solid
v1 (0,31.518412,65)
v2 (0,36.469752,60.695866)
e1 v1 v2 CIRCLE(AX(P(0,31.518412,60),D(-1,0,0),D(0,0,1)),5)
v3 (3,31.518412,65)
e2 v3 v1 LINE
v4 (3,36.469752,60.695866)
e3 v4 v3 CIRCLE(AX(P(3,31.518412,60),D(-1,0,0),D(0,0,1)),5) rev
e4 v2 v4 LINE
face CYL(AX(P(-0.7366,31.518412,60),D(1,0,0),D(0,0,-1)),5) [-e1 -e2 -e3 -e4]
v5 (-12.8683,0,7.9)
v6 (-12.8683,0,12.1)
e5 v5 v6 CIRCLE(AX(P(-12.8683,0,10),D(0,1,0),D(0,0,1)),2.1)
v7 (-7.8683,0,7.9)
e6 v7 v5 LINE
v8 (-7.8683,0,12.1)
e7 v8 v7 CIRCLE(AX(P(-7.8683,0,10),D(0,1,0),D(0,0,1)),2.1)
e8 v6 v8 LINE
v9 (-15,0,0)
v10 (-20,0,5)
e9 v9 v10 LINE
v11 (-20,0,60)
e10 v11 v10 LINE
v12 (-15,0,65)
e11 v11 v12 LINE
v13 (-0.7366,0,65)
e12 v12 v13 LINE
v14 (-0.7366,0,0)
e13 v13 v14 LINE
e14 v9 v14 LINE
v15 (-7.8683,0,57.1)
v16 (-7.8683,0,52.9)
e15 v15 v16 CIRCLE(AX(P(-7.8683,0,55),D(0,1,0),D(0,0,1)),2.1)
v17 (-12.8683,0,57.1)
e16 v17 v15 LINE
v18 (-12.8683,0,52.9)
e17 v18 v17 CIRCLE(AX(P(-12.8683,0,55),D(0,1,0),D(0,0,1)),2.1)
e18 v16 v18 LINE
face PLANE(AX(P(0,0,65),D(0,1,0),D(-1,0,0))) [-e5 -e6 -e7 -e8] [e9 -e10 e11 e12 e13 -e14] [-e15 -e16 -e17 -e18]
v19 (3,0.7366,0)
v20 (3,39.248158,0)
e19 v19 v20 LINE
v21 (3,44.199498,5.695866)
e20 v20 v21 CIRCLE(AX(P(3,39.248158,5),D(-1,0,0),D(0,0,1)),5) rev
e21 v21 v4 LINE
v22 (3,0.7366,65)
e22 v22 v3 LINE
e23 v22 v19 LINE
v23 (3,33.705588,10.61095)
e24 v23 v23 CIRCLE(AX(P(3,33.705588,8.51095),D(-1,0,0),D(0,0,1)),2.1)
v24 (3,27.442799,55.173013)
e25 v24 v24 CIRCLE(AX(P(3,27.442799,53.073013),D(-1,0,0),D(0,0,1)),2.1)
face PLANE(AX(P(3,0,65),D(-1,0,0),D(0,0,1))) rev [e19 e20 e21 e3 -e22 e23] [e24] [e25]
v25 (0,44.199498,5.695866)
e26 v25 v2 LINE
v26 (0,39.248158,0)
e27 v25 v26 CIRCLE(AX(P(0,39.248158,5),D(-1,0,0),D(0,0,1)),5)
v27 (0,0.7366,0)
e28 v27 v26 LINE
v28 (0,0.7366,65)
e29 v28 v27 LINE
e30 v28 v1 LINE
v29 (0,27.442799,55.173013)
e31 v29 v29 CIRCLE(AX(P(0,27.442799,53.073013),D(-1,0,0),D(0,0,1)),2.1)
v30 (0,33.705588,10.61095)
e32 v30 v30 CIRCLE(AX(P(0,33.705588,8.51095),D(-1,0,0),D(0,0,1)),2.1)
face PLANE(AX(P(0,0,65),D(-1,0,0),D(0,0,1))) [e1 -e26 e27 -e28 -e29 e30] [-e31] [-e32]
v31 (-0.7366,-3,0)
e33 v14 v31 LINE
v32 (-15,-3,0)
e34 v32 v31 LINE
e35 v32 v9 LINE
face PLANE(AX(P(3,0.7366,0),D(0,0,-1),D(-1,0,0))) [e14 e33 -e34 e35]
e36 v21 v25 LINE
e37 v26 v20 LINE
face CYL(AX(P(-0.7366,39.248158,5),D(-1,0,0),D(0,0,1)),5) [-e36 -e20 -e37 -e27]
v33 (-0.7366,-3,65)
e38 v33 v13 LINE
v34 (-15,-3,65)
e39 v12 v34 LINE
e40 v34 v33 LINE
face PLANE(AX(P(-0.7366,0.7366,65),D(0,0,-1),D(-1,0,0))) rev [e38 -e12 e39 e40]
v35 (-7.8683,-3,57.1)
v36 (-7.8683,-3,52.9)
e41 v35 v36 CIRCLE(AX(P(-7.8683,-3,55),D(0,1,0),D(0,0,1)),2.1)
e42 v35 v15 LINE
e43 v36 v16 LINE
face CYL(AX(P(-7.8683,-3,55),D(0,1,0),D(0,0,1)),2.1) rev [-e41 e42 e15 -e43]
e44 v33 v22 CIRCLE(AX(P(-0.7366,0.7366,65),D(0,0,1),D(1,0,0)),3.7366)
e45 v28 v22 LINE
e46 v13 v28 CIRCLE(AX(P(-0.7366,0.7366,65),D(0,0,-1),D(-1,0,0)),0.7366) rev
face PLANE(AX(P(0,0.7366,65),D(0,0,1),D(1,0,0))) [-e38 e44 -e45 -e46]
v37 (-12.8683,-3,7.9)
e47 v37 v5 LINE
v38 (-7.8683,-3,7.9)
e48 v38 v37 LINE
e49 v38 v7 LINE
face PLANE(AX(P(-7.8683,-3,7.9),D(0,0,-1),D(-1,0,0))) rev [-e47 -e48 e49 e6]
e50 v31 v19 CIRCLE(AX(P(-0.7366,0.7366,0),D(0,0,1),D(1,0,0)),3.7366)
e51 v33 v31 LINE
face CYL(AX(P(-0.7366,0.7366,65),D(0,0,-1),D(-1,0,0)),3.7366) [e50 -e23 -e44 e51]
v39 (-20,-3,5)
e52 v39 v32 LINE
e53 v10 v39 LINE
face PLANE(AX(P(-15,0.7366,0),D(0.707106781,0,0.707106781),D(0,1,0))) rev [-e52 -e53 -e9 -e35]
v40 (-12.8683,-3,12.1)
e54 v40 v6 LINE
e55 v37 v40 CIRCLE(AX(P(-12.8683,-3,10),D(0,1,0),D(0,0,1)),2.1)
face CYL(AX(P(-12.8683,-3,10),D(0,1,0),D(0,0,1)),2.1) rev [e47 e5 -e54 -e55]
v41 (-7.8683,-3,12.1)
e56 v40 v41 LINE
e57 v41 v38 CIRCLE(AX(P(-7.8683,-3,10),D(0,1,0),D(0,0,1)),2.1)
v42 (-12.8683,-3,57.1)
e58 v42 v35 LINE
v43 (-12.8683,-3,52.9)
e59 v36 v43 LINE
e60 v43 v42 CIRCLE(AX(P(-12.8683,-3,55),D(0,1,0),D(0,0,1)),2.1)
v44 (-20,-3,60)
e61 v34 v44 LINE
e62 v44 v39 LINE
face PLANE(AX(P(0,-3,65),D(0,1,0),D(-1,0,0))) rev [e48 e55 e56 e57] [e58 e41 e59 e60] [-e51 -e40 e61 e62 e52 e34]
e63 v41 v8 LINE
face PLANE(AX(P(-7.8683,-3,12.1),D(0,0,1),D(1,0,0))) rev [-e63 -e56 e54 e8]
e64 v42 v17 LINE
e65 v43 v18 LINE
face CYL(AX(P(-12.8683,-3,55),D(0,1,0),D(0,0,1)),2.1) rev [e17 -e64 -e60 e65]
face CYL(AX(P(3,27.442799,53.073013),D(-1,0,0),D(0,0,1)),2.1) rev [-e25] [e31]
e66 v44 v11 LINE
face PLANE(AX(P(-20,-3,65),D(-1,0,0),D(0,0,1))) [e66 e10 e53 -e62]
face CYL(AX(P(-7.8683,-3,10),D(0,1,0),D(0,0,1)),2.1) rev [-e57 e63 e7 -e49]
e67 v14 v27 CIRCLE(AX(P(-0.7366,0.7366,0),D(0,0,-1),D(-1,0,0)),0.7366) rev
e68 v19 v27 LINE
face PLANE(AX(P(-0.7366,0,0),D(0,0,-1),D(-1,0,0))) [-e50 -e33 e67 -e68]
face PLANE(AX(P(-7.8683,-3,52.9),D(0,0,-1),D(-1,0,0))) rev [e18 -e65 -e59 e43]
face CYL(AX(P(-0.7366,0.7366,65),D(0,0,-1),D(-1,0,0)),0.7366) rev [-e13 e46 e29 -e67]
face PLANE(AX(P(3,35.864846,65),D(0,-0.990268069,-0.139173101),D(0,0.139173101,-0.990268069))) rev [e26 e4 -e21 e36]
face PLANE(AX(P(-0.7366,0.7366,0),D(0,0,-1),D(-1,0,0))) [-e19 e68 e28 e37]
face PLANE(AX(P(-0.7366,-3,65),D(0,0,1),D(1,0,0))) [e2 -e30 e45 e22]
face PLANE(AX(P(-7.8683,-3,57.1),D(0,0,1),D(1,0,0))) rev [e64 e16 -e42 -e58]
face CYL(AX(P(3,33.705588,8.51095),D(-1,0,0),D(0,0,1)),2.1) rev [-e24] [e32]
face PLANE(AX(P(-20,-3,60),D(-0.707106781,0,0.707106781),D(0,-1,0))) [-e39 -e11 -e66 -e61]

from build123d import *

# Parameters (mm, degrees)
SM_BASE_FLANGE_1_DEPTH = 65
CUT_EXTRUDE_1_DEPTH    = 82.547532152
PATTERN_LINEAR_1_COUNT = 2
PATTERN_LINEAR_1_PITCH = 45
CHAMFER_1_SIZE         = 5
CUT_EXTRUDE_2_DEPTH    = 82.547532152
SKETCH_8_R             = 2.1
CUT_EXTRUDE_3_DEPTH    = 82.547532152
PATTERN_LINEAR_2_COUNT = 2
PATTERN_LINEAR_2_PITCH = 45
FILLET_1_R             = 5


# Sheet-metal steps are written as plain solids
with BuildPart() as part:
    # Sketch 1 → 基材-凸緣1 (new body)
    with BuildSketch(Plane.XY):
        with BuildLine():
            Line((0, 45), (0, 0.7366))
            ThreePointArc((0, 0.7366), (-0.215745145, 0.215745145), (-0.7366, 0))
            Line((-0.7366, 0), (-20, 0))
            Line((-20, 0), (-20, -3))
            Line((-20, -3), (-0.7366, -3))
            ThreePointArc((-0.7366, -3), (1.905575199, -1.905575199), (3, 0.7366))
            Line((3, 0.7366), (3, 45))
            Line((3, 45), (0, 45))
        make_face()
    extrude(amount=SM_BASE_FLANGE_1_DEPTH)

    # 草圖6 → 除料-伸長1 (cut, through all)
    with BuildSketch(Plane(origin=(0, 0, 0), x_dir=(-1, 0, 0), z_dir=(0, 1, 0))):
        with BuildLine():
            Line((7.8683, 57.1), (12.8683, 57.1))
            ThreePointArc((12.8683, 57.1), (14.9683, 55), (12.8683, 52.9))
            Line((12.8683, 52.9), (7.8683, 52.9))
            ThreePointArc((7.8683, 52.9), (5.7683, 55), (7.8683, 57.1))
        make_face()
    cut_extrude_1 = extrude(amount=-CUT_EXTRUDE_1_DEPTH, mode=Mode.SUBTRACT)

    # 直線複製排列1: 除料-伸長1 ×2
    with Locations(*[(0, 0, -i * PATTERN_LINEAR_1_PITCH) for i in range(1, PATTERN_LINEAR_1_COUNT)]):
        add(cut_extrude_1, mode=Mode.SUBTRACT)

    # 導角1
    chamfer_1_edges = [part.edges().sort_by_distance(p)[0] for p in [
        (-20, -1.5, 65),
        (-20, -1.5, 0),
    ]]
    chamfer(chamfer_1_edges, length=CHAMFER_1_SIZE)

    # 草圖7 → 除料-伸長2 (cut, through all)
    with BuildSketch(Plane.ZY):
        Polygon((0, 45), (65, 45), (65, 35.864845744), align=None)
    extrude(amount=-CUT_EXTRUDE_2_DEPTH, mode=Mode.SUBTRACT)

    # 草圖8 → 除料-伸長3 (cut, through all)
    with BuildSketch(Plane.ZY):
        with Locations((8.510949678, 33.705588303)):
            Circle(SKETCH_8_R)
    cut_extrude_3 = extrude(amount=-CUT_EXTRUDE_3_DEPTH, mode=Mode.SUBTRACT)

    # 直線複製排列2: 除料-伸長3 ×2
    with Locations(*[Vector(0, -0.13917310096005842, 0.9902680687415713) * (i * PATTERN_LINEAR_2_PITCH) for i in range(1, PATTERN_LINEAR_2_COUNT)]):
        add(cut_extrude_3, mode=Mode.SUBTRACT)

    # 圓角1
    fillet_1_edges = [part.edges().sort_by_distance(p)[0] for p in [
        (1.5, 35.864845744, 65),
        (1.5, 45, 0),
    ]]
    fillet(fillet_1_edges, radius=FILLET_1_R)


solid = part.part
